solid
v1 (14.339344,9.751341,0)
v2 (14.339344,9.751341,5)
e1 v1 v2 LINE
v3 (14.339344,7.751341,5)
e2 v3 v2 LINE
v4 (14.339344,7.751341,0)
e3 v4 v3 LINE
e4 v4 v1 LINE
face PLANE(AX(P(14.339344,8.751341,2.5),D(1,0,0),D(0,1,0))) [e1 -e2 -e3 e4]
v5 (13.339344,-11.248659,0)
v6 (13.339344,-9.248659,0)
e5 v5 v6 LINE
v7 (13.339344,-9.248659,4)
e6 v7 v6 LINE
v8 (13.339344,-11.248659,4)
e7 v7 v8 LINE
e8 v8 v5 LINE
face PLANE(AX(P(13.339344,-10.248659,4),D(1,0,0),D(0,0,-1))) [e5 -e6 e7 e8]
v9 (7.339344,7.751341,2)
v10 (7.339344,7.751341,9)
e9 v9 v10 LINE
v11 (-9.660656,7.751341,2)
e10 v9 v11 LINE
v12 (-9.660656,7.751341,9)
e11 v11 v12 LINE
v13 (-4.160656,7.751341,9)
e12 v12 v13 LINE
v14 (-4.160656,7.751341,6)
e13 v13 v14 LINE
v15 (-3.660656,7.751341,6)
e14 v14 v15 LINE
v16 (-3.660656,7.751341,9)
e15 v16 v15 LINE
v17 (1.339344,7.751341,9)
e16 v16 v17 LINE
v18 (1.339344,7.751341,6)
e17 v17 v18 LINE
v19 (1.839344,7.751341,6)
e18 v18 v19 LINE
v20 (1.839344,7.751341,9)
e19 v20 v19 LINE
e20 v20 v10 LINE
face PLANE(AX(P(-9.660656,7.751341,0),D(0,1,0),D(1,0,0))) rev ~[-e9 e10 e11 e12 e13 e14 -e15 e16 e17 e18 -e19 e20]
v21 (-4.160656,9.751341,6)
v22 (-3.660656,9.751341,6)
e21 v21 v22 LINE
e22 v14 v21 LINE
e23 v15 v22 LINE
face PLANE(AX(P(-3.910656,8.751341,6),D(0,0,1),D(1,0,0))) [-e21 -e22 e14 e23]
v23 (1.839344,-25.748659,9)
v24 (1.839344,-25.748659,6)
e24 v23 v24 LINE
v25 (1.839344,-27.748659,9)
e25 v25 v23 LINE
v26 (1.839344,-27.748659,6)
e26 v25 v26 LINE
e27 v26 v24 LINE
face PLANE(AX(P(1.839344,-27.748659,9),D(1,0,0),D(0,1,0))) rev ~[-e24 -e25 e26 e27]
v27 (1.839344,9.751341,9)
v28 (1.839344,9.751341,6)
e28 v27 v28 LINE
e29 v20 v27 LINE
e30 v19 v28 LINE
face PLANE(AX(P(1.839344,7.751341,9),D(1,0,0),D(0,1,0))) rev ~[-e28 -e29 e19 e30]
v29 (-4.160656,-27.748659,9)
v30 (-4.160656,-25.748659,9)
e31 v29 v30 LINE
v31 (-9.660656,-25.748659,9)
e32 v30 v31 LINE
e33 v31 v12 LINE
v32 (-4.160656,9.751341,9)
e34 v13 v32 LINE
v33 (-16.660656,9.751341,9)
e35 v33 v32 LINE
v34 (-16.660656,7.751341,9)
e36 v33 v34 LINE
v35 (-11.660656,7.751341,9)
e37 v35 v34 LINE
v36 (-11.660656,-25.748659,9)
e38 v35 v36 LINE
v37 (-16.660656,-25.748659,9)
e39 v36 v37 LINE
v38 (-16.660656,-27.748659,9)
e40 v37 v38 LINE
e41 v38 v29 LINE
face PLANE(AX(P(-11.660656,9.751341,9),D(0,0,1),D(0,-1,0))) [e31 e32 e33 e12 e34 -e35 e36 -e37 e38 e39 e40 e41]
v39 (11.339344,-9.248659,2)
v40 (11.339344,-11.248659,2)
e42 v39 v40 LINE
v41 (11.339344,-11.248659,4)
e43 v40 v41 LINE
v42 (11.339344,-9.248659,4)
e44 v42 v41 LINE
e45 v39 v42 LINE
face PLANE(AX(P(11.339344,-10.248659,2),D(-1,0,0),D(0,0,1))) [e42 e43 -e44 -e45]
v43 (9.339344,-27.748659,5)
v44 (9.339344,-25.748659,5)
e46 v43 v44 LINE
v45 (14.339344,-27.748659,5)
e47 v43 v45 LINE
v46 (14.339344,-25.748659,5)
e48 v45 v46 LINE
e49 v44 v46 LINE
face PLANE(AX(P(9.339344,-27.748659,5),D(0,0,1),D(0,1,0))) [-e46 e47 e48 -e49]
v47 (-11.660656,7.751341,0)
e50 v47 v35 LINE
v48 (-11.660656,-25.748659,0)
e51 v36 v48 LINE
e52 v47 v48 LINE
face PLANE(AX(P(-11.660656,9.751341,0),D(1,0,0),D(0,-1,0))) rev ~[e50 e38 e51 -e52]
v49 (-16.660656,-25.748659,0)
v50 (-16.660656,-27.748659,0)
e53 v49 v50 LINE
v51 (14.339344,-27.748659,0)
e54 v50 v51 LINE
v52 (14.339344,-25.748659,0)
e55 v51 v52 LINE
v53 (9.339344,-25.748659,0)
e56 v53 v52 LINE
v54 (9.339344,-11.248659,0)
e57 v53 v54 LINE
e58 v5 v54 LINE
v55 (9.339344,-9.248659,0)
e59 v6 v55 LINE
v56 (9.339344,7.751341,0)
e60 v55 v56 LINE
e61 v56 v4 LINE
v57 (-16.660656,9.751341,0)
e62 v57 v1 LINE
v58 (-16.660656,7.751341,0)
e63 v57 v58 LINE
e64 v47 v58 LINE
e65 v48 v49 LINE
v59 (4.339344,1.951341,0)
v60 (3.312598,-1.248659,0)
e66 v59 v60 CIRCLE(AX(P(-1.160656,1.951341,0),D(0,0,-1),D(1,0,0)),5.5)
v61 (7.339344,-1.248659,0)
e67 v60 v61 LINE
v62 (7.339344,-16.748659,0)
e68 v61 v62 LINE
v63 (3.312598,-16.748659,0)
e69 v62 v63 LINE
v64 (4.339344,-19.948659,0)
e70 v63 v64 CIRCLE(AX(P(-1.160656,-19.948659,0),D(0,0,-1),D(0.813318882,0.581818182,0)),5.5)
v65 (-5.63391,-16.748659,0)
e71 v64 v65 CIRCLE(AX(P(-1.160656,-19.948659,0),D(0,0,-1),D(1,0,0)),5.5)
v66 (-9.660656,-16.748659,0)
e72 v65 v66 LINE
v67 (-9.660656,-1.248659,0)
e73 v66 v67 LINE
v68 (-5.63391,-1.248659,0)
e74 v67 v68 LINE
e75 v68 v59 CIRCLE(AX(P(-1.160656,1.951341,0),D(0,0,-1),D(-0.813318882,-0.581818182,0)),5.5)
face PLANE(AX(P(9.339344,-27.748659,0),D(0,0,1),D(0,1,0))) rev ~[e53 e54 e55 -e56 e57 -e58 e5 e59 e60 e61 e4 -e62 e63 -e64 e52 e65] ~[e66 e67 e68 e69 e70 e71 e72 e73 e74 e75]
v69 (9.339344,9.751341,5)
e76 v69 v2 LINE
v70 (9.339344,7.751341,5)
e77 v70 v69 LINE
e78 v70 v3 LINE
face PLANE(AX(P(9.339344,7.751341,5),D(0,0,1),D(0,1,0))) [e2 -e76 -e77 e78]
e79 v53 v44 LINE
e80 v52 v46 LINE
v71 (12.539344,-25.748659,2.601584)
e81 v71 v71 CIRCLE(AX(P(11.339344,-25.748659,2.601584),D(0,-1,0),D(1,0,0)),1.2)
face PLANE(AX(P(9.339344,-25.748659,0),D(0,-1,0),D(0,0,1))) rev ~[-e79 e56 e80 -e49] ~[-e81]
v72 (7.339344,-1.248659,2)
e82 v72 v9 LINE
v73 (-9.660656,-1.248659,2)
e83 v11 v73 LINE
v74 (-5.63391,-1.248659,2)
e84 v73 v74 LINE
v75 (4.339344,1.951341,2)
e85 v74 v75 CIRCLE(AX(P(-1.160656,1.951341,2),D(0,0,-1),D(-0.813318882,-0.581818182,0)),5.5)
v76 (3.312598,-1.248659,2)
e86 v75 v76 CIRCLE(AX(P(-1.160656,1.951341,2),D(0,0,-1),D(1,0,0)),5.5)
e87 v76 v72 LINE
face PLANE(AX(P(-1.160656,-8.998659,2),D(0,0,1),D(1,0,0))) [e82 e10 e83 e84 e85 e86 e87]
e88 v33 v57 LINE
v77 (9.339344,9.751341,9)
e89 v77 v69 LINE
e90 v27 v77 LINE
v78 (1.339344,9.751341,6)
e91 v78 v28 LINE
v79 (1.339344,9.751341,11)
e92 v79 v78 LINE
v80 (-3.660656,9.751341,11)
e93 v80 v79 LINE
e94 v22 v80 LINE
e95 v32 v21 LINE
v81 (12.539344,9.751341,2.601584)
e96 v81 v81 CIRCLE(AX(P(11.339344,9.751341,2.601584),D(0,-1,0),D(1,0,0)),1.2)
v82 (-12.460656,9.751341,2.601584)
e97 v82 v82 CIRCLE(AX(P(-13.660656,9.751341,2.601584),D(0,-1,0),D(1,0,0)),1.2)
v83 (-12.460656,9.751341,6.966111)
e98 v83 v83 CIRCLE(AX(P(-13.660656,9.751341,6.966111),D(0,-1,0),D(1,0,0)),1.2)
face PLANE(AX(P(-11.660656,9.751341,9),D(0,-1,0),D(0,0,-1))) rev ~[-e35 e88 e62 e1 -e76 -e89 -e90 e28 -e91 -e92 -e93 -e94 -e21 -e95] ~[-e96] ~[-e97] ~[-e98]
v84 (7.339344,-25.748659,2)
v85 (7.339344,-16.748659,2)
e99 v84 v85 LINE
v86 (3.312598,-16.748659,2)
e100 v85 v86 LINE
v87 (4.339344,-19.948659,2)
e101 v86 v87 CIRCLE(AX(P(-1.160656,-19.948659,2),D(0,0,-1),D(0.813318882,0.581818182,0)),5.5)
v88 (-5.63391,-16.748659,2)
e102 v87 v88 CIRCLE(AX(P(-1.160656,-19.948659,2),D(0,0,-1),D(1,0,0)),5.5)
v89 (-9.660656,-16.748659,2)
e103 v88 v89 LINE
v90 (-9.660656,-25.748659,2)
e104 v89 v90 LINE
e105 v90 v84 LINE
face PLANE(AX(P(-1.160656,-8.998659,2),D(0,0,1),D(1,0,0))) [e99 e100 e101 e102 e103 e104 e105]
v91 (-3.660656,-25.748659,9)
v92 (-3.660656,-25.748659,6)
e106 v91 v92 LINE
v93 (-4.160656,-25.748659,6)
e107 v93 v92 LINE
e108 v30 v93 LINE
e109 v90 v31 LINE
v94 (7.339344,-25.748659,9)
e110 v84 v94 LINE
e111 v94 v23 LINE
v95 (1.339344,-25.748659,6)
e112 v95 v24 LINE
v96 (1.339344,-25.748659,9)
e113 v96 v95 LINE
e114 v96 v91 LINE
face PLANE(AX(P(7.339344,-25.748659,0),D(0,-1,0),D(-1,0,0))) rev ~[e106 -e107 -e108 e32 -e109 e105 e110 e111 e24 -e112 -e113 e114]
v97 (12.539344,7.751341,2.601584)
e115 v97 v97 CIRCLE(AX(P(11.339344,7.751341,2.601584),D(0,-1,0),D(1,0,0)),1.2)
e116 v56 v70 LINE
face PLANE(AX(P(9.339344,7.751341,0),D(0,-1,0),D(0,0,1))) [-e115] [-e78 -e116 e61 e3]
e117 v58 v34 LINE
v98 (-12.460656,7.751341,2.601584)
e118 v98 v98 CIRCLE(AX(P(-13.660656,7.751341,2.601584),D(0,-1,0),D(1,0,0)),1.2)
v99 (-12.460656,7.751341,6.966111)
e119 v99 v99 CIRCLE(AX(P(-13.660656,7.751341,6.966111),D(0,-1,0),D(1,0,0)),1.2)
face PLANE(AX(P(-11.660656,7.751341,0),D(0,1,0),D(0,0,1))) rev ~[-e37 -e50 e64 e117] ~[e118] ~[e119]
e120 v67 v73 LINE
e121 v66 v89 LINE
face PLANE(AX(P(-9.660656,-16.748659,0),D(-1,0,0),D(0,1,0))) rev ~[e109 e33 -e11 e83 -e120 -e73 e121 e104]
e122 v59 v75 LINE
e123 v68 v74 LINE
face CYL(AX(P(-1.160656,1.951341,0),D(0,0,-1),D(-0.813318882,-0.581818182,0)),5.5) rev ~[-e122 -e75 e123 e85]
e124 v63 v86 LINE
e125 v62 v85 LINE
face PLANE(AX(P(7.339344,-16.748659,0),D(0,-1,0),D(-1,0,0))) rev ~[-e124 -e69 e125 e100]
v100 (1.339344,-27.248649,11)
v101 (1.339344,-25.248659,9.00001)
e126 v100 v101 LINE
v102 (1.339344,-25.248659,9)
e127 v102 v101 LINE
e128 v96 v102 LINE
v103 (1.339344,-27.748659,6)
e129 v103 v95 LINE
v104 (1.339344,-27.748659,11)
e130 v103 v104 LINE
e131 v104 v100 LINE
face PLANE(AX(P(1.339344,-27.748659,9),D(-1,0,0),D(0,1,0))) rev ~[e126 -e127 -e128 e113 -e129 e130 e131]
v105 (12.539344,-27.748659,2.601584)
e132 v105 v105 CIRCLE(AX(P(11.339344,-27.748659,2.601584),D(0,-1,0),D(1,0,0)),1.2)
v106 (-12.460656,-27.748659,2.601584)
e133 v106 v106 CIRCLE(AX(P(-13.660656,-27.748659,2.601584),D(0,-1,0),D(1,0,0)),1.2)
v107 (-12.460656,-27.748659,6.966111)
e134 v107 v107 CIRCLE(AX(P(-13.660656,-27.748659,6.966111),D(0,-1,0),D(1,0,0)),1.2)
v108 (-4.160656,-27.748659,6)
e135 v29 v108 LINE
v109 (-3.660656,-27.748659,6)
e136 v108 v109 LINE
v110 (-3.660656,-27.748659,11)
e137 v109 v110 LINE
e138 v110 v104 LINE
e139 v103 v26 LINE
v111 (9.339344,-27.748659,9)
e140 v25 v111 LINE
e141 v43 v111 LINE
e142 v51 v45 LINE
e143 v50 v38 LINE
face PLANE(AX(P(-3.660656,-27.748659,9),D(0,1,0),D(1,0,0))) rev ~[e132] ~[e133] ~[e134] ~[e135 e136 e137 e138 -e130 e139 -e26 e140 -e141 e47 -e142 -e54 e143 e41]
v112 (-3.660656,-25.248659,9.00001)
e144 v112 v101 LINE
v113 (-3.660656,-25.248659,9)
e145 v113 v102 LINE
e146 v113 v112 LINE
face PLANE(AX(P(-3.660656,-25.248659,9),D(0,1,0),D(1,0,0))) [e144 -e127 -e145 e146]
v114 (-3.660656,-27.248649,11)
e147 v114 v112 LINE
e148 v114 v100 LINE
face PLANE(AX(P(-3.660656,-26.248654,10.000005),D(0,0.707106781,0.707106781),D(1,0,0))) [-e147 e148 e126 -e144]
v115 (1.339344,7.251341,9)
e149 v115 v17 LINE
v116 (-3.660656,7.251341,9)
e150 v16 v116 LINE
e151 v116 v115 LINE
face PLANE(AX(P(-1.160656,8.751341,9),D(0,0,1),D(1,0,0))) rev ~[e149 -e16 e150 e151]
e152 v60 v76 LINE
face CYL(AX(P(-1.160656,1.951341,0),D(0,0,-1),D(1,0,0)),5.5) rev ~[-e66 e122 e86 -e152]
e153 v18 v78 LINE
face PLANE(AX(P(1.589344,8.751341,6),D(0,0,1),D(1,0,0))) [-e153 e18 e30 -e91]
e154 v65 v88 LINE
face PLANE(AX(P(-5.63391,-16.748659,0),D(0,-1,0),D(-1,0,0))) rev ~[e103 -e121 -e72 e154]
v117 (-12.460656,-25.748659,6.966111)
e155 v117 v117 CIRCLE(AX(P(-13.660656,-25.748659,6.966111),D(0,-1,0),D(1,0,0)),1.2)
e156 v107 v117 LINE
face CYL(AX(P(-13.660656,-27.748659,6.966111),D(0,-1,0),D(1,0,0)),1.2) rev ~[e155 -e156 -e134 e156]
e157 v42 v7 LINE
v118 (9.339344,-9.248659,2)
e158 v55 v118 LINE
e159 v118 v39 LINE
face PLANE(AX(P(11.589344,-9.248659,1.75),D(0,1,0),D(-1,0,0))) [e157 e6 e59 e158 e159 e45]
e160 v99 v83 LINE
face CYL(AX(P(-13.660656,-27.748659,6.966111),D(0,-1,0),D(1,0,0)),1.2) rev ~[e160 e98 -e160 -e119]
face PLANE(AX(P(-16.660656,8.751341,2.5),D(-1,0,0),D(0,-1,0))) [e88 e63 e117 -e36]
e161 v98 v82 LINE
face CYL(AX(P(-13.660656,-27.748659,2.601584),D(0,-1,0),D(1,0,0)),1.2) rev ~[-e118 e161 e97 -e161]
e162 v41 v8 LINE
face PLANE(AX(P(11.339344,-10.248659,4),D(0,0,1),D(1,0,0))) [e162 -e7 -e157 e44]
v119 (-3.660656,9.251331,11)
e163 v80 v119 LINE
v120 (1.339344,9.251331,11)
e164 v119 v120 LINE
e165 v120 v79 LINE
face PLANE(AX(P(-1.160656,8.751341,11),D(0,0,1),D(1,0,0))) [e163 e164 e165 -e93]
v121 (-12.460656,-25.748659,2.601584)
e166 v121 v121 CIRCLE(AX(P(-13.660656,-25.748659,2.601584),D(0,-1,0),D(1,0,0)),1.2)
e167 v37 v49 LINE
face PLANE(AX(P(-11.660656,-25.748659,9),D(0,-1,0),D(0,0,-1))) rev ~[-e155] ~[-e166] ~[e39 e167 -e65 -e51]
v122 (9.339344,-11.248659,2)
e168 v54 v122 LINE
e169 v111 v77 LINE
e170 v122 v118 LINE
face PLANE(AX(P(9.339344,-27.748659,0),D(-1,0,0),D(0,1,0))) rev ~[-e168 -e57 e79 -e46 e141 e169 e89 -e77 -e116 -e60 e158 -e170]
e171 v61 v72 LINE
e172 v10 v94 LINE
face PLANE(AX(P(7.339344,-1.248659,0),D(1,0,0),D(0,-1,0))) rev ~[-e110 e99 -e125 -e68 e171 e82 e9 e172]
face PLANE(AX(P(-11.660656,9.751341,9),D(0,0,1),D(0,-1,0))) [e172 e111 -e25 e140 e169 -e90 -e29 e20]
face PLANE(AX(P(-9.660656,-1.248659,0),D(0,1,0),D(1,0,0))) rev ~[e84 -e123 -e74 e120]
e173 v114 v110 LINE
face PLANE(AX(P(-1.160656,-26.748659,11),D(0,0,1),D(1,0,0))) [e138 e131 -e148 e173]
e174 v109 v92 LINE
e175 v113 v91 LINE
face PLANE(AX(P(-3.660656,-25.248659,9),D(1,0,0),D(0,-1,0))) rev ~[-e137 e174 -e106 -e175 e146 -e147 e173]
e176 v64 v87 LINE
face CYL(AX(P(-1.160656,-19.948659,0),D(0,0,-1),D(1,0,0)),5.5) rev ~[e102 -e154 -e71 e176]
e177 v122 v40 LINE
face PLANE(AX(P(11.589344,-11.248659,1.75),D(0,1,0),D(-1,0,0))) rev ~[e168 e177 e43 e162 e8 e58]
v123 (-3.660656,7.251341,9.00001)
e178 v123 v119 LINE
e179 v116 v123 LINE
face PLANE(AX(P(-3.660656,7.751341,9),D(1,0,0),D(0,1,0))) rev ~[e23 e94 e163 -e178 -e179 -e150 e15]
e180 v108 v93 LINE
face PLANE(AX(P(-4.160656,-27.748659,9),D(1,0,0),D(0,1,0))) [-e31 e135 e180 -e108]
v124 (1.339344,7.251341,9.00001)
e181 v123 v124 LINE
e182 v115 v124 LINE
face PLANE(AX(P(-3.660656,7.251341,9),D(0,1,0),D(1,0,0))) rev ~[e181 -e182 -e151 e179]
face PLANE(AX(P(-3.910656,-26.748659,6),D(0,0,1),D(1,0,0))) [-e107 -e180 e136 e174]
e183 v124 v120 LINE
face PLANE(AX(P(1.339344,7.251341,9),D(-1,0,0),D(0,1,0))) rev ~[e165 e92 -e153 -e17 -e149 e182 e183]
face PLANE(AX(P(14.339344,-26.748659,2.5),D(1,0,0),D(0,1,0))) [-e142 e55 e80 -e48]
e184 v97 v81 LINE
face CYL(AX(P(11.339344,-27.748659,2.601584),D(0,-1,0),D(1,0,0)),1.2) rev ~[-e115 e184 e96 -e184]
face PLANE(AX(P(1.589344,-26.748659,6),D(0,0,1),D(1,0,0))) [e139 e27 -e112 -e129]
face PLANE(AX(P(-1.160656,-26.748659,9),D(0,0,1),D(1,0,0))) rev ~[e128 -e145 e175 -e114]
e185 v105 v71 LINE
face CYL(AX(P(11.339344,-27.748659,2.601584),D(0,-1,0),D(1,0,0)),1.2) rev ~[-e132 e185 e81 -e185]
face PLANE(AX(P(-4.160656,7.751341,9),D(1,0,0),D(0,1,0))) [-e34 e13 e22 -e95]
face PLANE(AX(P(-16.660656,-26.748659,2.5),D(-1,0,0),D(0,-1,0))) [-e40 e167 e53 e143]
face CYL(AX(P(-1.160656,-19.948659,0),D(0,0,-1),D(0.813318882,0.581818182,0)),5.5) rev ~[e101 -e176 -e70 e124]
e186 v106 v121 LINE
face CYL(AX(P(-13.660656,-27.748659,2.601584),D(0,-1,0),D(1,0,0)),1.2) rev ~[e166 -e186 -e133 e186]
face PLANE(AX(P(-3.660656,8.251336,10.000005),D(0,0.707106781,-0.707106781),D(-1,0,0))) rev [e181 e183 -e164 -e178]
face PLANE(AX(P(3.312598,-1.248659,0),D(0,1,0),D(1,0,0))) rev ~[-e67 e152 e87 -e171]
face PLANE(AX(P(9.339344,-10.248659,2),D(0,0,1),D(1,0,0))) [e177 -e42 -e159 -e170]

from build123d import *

# Parameters (mm, degrees)
F1_DEPTH  = 2
F2_DEPTH  = 9
F3_W      = 2
F3_H      = 5
F3_H_2    = 4
F4_DEPTH  = 5
F5_W      = 2
F5_H      = 5
F6_DEPTH  = 5
F7_R      = 1.2
F8_DEPTH  = 40
F11_DEPTH = 1
F12_W     = 5
F12_H     = 2
F12_H_2   = 0.5
F13_DEPTH = 2
F14_SIZE  = 1.99999
F12_W_2   = 0.5
F15_DEPTH = 3


# Not quite as in the source:
# - a fillet or chamfer is up to 0.001 mm smaller than in the source, because OpenCascade refuses the exact size


with BuildPart() as f1:
    # F0 (on Top) → F1 (new body)
    with BuildSketch(Plane.XY):
        Polygon((-5.1606558692, 9.7513413054), (-11.6606558692, 9.7513413054), (-11.6606558692, -27.7486586946), (-5.1606558692, -27.7486586946), (2.8393441308, -27.7486586946), (9.3393441308, -27.7486586946), (9.3393441308, 9.7513413054), (2.8393441308, 9.7513413054), align=None)
        Polygon((-9.6606558692, -1.2486586946), (-9.6606558692, 7.7513413054), (7.3393441308, 7.7513413054), (7.3393441308, -1.2486586946), (7.3393441308, -16.7486586946), (7.3393441308, -25.7486586946), (-9.6606558692, -25.7486586946), (-9.6606558692, -16.7486586946), align=None, mode=Mode.SUBTRACT)
        with BuildLine():
            Line((7.3393441308, 7.7513413054), (-9.6606558692, 7.7513413054))
            Line((-9.6606558692, 7.7513413054), (-9.6606558692, -1.2486586946))
            Line((-9.6606558692, -1.2486586946), (-5.6339097184, -1.2486586946))
            ThreePointArc((-5.6339097184, -1.2486586946), (-2.8409986659, 7.1883679509), (4.3393441308, 1.9513413054))
            ThreePointArc((4.3393441308, 1.9513413054), (4.0763707763, 0.2709985087), (3.3125979801, -1.2486586946))
            Line((3.3125979801, -1.2486586946), (7.3393441308, -1.2486586946))
            Line((7.3393441308, -1.2486586946), (7.3393441308, 7.7513413054))
        make_face()
        with BuildLine():
            Line((-5.6339097184, -16.7486586946), (-9.6606558692, -16.7486586946))
            Line((-9.6606558692, -16.7486586946), (-9.6606558692, -25.7486586946))
            Line((-9.6606558692, -25.7486586946), (7.3393441308, -25.7486586946))
            Line((7.3393441308, -25.7486586946), (7.3393441308, -16.7486586946))
            Line((7.3393441308, -16.7486586946), (3.3125979801, -16.7486586946))
            ThreePointArc((3.3125979801, -16.7486586946), (4.0763707763, -18.2683158979), (4.3393441308, -19.9486586946))
            ThreePointArc((4.3393441308, -19.9486586946), (-2.8409986659, -25.1856853401), (-5.6339097184, -16.7486586946))
        make_face()
    extrude(amount=F1_DEPTH)

    # F0 (on Top) → F2 (join)
    with BuildSketch(Plane.XY):
        Polygon((-5.1606558692, 9.7513413054), (-11.6606558692, 9.7513413054), (-11.6606558692, -27.7486586946), (-5.1606558692, -27.7486586946), (2.8393441308, -27.7486586946), (9.3393441308, -27.7486586946), (9.3393441308, 9.7513413054), (2.8393441308, 9.7513413054), align=None)
        Polygon((-9.6606558692, -1.2486586946), (-9.6606558692, 7.7513413054), (7.3393441308, 7.7513413054), (7.3393441308, -1.2486586946), (7.3393441308, -16.7486586946), (7.3393441308, -25.7486586946), (-9.6606558692, -25.7486586946), (-9.6606558692, -16.7486586946), align=None, mode=Mode.SUBTRACT)
    extrude(amount=F2_DEPTH)

    # F3 (on face) → F4 (join)
    with BuildSketch(Plane(origin=(-11.6606558692, 0, 0), x_dir=(0, -1, 0), z_dir=(-1, 0, 0))):
        with Locations((-8.7513413054, 2.5)):
            Rectangle(F3_W, F3_H)
        with Locations((-8.7513413054, 7)):
            Rectangle(F3_W, F3_H_2)
        with Locations((26.7486586946, 2.5)):
            Rectangle(F3_W, F3_H)
        with Locations((26.7486586946, 7)):
            Rectangle(F3_W, F3_H_2)
    extrude(amount=F4_DEPTH)

    # F5 (on face) → F6 (join)
    with BuildSketch(Plane.YZ.offset(9.3393441308)):
        with Locations((-26.7486586946, 2.5)):
            Rectangle(F5_W, F5_H)
        with Locations((8.7513413054, 2.5)):
            Rectangle(F5_W, F5_H)
    extrude(amount=F6_DEPTH)

    # F7 (on face) → F8 (cut)
    with BuildSketch(Plane.XZ.offset(27.7486586946)):
        with Locations((-13.6606558692, 2.6015837211)):
            Circle(F7_R)
        with Locations((11.3393441308, 2.6015837211)):
            Circle(F7_R)
        with Locations((-13.6606558692, 6.9661107846)):
            Circle(F7_R)
    extrude(amount=-F8_DEPTH, mode=Mode.SUBTRACT)

    # F10 (on offset) → F11 (join, symmetric)
    with BuildSketch(Plane(origin=(0, -10.2486586946, 0), x_dir=(-1, 0, 0), z_dir=(0, 1, 0))):
        Polygon((-13.3393441308, 4), (-13.3393441308, 0), (-9.3393441308, 0), (-9.3393441308, 2), (-11.3393441308, 2), (-11.3393441308, 4), align=None)
    extrude(amount=F11_DEPTH, both=True)

    # F12 (on face) → F13 (join)
    with BuildSketch(Plane.XY.offset(9)):
        with Locations((-1.1606558692, -26.7486586946)):
            Rectangle(F12_W, F12_H)
        with Locations((-1.1606558692, -25.4986586946)):
            Rectangle(F12_W, F12_H_2)
        with Locations((-1.1606558692, 8.7513413054)):
            Rectangle(F12_W, F12_H)
        with Locations((-1.1606558692, 7.5013413054)):
            Rectangle(F12_W, F12_H_2)
    extrude(amount=F13_DEPTH)

    # F14 (size 2 in the source; OpenCascade refuses exactly that, so slightly less here)
    f14_edges = [f1.edges().sort_by_distance(p)[0] for p in [
        (-1.160656, -25.248659, 11),
        (-1.160656, 7.251341, 11),
    ]]
    chamfer(f14_edges, length=F14_SIZE)

    # F12 (on face) → F15 (cut)
    with BuildSketch(Plane.XY.offset(9)):
        with Locations((-3.9106558692, -26.7486586946)):
            Rectangle(F12_W_2, F12_H)
        with Locations((1.5893441308, -26.7486586946)):
            Rectangle(F12_W_2, F12_H)
        with Locations((1.5893441308, 8.7513413054)):
            Rectangle(F12_W_2, F12_H)
        with Locations((-3.9106558692, 8.7513413054)):
            Rectangle(F12_W_2, F12_H)
    extrude(amount=-F15_DEPTH, mode=Mode.SUBTRACT)


solid = f1.part
